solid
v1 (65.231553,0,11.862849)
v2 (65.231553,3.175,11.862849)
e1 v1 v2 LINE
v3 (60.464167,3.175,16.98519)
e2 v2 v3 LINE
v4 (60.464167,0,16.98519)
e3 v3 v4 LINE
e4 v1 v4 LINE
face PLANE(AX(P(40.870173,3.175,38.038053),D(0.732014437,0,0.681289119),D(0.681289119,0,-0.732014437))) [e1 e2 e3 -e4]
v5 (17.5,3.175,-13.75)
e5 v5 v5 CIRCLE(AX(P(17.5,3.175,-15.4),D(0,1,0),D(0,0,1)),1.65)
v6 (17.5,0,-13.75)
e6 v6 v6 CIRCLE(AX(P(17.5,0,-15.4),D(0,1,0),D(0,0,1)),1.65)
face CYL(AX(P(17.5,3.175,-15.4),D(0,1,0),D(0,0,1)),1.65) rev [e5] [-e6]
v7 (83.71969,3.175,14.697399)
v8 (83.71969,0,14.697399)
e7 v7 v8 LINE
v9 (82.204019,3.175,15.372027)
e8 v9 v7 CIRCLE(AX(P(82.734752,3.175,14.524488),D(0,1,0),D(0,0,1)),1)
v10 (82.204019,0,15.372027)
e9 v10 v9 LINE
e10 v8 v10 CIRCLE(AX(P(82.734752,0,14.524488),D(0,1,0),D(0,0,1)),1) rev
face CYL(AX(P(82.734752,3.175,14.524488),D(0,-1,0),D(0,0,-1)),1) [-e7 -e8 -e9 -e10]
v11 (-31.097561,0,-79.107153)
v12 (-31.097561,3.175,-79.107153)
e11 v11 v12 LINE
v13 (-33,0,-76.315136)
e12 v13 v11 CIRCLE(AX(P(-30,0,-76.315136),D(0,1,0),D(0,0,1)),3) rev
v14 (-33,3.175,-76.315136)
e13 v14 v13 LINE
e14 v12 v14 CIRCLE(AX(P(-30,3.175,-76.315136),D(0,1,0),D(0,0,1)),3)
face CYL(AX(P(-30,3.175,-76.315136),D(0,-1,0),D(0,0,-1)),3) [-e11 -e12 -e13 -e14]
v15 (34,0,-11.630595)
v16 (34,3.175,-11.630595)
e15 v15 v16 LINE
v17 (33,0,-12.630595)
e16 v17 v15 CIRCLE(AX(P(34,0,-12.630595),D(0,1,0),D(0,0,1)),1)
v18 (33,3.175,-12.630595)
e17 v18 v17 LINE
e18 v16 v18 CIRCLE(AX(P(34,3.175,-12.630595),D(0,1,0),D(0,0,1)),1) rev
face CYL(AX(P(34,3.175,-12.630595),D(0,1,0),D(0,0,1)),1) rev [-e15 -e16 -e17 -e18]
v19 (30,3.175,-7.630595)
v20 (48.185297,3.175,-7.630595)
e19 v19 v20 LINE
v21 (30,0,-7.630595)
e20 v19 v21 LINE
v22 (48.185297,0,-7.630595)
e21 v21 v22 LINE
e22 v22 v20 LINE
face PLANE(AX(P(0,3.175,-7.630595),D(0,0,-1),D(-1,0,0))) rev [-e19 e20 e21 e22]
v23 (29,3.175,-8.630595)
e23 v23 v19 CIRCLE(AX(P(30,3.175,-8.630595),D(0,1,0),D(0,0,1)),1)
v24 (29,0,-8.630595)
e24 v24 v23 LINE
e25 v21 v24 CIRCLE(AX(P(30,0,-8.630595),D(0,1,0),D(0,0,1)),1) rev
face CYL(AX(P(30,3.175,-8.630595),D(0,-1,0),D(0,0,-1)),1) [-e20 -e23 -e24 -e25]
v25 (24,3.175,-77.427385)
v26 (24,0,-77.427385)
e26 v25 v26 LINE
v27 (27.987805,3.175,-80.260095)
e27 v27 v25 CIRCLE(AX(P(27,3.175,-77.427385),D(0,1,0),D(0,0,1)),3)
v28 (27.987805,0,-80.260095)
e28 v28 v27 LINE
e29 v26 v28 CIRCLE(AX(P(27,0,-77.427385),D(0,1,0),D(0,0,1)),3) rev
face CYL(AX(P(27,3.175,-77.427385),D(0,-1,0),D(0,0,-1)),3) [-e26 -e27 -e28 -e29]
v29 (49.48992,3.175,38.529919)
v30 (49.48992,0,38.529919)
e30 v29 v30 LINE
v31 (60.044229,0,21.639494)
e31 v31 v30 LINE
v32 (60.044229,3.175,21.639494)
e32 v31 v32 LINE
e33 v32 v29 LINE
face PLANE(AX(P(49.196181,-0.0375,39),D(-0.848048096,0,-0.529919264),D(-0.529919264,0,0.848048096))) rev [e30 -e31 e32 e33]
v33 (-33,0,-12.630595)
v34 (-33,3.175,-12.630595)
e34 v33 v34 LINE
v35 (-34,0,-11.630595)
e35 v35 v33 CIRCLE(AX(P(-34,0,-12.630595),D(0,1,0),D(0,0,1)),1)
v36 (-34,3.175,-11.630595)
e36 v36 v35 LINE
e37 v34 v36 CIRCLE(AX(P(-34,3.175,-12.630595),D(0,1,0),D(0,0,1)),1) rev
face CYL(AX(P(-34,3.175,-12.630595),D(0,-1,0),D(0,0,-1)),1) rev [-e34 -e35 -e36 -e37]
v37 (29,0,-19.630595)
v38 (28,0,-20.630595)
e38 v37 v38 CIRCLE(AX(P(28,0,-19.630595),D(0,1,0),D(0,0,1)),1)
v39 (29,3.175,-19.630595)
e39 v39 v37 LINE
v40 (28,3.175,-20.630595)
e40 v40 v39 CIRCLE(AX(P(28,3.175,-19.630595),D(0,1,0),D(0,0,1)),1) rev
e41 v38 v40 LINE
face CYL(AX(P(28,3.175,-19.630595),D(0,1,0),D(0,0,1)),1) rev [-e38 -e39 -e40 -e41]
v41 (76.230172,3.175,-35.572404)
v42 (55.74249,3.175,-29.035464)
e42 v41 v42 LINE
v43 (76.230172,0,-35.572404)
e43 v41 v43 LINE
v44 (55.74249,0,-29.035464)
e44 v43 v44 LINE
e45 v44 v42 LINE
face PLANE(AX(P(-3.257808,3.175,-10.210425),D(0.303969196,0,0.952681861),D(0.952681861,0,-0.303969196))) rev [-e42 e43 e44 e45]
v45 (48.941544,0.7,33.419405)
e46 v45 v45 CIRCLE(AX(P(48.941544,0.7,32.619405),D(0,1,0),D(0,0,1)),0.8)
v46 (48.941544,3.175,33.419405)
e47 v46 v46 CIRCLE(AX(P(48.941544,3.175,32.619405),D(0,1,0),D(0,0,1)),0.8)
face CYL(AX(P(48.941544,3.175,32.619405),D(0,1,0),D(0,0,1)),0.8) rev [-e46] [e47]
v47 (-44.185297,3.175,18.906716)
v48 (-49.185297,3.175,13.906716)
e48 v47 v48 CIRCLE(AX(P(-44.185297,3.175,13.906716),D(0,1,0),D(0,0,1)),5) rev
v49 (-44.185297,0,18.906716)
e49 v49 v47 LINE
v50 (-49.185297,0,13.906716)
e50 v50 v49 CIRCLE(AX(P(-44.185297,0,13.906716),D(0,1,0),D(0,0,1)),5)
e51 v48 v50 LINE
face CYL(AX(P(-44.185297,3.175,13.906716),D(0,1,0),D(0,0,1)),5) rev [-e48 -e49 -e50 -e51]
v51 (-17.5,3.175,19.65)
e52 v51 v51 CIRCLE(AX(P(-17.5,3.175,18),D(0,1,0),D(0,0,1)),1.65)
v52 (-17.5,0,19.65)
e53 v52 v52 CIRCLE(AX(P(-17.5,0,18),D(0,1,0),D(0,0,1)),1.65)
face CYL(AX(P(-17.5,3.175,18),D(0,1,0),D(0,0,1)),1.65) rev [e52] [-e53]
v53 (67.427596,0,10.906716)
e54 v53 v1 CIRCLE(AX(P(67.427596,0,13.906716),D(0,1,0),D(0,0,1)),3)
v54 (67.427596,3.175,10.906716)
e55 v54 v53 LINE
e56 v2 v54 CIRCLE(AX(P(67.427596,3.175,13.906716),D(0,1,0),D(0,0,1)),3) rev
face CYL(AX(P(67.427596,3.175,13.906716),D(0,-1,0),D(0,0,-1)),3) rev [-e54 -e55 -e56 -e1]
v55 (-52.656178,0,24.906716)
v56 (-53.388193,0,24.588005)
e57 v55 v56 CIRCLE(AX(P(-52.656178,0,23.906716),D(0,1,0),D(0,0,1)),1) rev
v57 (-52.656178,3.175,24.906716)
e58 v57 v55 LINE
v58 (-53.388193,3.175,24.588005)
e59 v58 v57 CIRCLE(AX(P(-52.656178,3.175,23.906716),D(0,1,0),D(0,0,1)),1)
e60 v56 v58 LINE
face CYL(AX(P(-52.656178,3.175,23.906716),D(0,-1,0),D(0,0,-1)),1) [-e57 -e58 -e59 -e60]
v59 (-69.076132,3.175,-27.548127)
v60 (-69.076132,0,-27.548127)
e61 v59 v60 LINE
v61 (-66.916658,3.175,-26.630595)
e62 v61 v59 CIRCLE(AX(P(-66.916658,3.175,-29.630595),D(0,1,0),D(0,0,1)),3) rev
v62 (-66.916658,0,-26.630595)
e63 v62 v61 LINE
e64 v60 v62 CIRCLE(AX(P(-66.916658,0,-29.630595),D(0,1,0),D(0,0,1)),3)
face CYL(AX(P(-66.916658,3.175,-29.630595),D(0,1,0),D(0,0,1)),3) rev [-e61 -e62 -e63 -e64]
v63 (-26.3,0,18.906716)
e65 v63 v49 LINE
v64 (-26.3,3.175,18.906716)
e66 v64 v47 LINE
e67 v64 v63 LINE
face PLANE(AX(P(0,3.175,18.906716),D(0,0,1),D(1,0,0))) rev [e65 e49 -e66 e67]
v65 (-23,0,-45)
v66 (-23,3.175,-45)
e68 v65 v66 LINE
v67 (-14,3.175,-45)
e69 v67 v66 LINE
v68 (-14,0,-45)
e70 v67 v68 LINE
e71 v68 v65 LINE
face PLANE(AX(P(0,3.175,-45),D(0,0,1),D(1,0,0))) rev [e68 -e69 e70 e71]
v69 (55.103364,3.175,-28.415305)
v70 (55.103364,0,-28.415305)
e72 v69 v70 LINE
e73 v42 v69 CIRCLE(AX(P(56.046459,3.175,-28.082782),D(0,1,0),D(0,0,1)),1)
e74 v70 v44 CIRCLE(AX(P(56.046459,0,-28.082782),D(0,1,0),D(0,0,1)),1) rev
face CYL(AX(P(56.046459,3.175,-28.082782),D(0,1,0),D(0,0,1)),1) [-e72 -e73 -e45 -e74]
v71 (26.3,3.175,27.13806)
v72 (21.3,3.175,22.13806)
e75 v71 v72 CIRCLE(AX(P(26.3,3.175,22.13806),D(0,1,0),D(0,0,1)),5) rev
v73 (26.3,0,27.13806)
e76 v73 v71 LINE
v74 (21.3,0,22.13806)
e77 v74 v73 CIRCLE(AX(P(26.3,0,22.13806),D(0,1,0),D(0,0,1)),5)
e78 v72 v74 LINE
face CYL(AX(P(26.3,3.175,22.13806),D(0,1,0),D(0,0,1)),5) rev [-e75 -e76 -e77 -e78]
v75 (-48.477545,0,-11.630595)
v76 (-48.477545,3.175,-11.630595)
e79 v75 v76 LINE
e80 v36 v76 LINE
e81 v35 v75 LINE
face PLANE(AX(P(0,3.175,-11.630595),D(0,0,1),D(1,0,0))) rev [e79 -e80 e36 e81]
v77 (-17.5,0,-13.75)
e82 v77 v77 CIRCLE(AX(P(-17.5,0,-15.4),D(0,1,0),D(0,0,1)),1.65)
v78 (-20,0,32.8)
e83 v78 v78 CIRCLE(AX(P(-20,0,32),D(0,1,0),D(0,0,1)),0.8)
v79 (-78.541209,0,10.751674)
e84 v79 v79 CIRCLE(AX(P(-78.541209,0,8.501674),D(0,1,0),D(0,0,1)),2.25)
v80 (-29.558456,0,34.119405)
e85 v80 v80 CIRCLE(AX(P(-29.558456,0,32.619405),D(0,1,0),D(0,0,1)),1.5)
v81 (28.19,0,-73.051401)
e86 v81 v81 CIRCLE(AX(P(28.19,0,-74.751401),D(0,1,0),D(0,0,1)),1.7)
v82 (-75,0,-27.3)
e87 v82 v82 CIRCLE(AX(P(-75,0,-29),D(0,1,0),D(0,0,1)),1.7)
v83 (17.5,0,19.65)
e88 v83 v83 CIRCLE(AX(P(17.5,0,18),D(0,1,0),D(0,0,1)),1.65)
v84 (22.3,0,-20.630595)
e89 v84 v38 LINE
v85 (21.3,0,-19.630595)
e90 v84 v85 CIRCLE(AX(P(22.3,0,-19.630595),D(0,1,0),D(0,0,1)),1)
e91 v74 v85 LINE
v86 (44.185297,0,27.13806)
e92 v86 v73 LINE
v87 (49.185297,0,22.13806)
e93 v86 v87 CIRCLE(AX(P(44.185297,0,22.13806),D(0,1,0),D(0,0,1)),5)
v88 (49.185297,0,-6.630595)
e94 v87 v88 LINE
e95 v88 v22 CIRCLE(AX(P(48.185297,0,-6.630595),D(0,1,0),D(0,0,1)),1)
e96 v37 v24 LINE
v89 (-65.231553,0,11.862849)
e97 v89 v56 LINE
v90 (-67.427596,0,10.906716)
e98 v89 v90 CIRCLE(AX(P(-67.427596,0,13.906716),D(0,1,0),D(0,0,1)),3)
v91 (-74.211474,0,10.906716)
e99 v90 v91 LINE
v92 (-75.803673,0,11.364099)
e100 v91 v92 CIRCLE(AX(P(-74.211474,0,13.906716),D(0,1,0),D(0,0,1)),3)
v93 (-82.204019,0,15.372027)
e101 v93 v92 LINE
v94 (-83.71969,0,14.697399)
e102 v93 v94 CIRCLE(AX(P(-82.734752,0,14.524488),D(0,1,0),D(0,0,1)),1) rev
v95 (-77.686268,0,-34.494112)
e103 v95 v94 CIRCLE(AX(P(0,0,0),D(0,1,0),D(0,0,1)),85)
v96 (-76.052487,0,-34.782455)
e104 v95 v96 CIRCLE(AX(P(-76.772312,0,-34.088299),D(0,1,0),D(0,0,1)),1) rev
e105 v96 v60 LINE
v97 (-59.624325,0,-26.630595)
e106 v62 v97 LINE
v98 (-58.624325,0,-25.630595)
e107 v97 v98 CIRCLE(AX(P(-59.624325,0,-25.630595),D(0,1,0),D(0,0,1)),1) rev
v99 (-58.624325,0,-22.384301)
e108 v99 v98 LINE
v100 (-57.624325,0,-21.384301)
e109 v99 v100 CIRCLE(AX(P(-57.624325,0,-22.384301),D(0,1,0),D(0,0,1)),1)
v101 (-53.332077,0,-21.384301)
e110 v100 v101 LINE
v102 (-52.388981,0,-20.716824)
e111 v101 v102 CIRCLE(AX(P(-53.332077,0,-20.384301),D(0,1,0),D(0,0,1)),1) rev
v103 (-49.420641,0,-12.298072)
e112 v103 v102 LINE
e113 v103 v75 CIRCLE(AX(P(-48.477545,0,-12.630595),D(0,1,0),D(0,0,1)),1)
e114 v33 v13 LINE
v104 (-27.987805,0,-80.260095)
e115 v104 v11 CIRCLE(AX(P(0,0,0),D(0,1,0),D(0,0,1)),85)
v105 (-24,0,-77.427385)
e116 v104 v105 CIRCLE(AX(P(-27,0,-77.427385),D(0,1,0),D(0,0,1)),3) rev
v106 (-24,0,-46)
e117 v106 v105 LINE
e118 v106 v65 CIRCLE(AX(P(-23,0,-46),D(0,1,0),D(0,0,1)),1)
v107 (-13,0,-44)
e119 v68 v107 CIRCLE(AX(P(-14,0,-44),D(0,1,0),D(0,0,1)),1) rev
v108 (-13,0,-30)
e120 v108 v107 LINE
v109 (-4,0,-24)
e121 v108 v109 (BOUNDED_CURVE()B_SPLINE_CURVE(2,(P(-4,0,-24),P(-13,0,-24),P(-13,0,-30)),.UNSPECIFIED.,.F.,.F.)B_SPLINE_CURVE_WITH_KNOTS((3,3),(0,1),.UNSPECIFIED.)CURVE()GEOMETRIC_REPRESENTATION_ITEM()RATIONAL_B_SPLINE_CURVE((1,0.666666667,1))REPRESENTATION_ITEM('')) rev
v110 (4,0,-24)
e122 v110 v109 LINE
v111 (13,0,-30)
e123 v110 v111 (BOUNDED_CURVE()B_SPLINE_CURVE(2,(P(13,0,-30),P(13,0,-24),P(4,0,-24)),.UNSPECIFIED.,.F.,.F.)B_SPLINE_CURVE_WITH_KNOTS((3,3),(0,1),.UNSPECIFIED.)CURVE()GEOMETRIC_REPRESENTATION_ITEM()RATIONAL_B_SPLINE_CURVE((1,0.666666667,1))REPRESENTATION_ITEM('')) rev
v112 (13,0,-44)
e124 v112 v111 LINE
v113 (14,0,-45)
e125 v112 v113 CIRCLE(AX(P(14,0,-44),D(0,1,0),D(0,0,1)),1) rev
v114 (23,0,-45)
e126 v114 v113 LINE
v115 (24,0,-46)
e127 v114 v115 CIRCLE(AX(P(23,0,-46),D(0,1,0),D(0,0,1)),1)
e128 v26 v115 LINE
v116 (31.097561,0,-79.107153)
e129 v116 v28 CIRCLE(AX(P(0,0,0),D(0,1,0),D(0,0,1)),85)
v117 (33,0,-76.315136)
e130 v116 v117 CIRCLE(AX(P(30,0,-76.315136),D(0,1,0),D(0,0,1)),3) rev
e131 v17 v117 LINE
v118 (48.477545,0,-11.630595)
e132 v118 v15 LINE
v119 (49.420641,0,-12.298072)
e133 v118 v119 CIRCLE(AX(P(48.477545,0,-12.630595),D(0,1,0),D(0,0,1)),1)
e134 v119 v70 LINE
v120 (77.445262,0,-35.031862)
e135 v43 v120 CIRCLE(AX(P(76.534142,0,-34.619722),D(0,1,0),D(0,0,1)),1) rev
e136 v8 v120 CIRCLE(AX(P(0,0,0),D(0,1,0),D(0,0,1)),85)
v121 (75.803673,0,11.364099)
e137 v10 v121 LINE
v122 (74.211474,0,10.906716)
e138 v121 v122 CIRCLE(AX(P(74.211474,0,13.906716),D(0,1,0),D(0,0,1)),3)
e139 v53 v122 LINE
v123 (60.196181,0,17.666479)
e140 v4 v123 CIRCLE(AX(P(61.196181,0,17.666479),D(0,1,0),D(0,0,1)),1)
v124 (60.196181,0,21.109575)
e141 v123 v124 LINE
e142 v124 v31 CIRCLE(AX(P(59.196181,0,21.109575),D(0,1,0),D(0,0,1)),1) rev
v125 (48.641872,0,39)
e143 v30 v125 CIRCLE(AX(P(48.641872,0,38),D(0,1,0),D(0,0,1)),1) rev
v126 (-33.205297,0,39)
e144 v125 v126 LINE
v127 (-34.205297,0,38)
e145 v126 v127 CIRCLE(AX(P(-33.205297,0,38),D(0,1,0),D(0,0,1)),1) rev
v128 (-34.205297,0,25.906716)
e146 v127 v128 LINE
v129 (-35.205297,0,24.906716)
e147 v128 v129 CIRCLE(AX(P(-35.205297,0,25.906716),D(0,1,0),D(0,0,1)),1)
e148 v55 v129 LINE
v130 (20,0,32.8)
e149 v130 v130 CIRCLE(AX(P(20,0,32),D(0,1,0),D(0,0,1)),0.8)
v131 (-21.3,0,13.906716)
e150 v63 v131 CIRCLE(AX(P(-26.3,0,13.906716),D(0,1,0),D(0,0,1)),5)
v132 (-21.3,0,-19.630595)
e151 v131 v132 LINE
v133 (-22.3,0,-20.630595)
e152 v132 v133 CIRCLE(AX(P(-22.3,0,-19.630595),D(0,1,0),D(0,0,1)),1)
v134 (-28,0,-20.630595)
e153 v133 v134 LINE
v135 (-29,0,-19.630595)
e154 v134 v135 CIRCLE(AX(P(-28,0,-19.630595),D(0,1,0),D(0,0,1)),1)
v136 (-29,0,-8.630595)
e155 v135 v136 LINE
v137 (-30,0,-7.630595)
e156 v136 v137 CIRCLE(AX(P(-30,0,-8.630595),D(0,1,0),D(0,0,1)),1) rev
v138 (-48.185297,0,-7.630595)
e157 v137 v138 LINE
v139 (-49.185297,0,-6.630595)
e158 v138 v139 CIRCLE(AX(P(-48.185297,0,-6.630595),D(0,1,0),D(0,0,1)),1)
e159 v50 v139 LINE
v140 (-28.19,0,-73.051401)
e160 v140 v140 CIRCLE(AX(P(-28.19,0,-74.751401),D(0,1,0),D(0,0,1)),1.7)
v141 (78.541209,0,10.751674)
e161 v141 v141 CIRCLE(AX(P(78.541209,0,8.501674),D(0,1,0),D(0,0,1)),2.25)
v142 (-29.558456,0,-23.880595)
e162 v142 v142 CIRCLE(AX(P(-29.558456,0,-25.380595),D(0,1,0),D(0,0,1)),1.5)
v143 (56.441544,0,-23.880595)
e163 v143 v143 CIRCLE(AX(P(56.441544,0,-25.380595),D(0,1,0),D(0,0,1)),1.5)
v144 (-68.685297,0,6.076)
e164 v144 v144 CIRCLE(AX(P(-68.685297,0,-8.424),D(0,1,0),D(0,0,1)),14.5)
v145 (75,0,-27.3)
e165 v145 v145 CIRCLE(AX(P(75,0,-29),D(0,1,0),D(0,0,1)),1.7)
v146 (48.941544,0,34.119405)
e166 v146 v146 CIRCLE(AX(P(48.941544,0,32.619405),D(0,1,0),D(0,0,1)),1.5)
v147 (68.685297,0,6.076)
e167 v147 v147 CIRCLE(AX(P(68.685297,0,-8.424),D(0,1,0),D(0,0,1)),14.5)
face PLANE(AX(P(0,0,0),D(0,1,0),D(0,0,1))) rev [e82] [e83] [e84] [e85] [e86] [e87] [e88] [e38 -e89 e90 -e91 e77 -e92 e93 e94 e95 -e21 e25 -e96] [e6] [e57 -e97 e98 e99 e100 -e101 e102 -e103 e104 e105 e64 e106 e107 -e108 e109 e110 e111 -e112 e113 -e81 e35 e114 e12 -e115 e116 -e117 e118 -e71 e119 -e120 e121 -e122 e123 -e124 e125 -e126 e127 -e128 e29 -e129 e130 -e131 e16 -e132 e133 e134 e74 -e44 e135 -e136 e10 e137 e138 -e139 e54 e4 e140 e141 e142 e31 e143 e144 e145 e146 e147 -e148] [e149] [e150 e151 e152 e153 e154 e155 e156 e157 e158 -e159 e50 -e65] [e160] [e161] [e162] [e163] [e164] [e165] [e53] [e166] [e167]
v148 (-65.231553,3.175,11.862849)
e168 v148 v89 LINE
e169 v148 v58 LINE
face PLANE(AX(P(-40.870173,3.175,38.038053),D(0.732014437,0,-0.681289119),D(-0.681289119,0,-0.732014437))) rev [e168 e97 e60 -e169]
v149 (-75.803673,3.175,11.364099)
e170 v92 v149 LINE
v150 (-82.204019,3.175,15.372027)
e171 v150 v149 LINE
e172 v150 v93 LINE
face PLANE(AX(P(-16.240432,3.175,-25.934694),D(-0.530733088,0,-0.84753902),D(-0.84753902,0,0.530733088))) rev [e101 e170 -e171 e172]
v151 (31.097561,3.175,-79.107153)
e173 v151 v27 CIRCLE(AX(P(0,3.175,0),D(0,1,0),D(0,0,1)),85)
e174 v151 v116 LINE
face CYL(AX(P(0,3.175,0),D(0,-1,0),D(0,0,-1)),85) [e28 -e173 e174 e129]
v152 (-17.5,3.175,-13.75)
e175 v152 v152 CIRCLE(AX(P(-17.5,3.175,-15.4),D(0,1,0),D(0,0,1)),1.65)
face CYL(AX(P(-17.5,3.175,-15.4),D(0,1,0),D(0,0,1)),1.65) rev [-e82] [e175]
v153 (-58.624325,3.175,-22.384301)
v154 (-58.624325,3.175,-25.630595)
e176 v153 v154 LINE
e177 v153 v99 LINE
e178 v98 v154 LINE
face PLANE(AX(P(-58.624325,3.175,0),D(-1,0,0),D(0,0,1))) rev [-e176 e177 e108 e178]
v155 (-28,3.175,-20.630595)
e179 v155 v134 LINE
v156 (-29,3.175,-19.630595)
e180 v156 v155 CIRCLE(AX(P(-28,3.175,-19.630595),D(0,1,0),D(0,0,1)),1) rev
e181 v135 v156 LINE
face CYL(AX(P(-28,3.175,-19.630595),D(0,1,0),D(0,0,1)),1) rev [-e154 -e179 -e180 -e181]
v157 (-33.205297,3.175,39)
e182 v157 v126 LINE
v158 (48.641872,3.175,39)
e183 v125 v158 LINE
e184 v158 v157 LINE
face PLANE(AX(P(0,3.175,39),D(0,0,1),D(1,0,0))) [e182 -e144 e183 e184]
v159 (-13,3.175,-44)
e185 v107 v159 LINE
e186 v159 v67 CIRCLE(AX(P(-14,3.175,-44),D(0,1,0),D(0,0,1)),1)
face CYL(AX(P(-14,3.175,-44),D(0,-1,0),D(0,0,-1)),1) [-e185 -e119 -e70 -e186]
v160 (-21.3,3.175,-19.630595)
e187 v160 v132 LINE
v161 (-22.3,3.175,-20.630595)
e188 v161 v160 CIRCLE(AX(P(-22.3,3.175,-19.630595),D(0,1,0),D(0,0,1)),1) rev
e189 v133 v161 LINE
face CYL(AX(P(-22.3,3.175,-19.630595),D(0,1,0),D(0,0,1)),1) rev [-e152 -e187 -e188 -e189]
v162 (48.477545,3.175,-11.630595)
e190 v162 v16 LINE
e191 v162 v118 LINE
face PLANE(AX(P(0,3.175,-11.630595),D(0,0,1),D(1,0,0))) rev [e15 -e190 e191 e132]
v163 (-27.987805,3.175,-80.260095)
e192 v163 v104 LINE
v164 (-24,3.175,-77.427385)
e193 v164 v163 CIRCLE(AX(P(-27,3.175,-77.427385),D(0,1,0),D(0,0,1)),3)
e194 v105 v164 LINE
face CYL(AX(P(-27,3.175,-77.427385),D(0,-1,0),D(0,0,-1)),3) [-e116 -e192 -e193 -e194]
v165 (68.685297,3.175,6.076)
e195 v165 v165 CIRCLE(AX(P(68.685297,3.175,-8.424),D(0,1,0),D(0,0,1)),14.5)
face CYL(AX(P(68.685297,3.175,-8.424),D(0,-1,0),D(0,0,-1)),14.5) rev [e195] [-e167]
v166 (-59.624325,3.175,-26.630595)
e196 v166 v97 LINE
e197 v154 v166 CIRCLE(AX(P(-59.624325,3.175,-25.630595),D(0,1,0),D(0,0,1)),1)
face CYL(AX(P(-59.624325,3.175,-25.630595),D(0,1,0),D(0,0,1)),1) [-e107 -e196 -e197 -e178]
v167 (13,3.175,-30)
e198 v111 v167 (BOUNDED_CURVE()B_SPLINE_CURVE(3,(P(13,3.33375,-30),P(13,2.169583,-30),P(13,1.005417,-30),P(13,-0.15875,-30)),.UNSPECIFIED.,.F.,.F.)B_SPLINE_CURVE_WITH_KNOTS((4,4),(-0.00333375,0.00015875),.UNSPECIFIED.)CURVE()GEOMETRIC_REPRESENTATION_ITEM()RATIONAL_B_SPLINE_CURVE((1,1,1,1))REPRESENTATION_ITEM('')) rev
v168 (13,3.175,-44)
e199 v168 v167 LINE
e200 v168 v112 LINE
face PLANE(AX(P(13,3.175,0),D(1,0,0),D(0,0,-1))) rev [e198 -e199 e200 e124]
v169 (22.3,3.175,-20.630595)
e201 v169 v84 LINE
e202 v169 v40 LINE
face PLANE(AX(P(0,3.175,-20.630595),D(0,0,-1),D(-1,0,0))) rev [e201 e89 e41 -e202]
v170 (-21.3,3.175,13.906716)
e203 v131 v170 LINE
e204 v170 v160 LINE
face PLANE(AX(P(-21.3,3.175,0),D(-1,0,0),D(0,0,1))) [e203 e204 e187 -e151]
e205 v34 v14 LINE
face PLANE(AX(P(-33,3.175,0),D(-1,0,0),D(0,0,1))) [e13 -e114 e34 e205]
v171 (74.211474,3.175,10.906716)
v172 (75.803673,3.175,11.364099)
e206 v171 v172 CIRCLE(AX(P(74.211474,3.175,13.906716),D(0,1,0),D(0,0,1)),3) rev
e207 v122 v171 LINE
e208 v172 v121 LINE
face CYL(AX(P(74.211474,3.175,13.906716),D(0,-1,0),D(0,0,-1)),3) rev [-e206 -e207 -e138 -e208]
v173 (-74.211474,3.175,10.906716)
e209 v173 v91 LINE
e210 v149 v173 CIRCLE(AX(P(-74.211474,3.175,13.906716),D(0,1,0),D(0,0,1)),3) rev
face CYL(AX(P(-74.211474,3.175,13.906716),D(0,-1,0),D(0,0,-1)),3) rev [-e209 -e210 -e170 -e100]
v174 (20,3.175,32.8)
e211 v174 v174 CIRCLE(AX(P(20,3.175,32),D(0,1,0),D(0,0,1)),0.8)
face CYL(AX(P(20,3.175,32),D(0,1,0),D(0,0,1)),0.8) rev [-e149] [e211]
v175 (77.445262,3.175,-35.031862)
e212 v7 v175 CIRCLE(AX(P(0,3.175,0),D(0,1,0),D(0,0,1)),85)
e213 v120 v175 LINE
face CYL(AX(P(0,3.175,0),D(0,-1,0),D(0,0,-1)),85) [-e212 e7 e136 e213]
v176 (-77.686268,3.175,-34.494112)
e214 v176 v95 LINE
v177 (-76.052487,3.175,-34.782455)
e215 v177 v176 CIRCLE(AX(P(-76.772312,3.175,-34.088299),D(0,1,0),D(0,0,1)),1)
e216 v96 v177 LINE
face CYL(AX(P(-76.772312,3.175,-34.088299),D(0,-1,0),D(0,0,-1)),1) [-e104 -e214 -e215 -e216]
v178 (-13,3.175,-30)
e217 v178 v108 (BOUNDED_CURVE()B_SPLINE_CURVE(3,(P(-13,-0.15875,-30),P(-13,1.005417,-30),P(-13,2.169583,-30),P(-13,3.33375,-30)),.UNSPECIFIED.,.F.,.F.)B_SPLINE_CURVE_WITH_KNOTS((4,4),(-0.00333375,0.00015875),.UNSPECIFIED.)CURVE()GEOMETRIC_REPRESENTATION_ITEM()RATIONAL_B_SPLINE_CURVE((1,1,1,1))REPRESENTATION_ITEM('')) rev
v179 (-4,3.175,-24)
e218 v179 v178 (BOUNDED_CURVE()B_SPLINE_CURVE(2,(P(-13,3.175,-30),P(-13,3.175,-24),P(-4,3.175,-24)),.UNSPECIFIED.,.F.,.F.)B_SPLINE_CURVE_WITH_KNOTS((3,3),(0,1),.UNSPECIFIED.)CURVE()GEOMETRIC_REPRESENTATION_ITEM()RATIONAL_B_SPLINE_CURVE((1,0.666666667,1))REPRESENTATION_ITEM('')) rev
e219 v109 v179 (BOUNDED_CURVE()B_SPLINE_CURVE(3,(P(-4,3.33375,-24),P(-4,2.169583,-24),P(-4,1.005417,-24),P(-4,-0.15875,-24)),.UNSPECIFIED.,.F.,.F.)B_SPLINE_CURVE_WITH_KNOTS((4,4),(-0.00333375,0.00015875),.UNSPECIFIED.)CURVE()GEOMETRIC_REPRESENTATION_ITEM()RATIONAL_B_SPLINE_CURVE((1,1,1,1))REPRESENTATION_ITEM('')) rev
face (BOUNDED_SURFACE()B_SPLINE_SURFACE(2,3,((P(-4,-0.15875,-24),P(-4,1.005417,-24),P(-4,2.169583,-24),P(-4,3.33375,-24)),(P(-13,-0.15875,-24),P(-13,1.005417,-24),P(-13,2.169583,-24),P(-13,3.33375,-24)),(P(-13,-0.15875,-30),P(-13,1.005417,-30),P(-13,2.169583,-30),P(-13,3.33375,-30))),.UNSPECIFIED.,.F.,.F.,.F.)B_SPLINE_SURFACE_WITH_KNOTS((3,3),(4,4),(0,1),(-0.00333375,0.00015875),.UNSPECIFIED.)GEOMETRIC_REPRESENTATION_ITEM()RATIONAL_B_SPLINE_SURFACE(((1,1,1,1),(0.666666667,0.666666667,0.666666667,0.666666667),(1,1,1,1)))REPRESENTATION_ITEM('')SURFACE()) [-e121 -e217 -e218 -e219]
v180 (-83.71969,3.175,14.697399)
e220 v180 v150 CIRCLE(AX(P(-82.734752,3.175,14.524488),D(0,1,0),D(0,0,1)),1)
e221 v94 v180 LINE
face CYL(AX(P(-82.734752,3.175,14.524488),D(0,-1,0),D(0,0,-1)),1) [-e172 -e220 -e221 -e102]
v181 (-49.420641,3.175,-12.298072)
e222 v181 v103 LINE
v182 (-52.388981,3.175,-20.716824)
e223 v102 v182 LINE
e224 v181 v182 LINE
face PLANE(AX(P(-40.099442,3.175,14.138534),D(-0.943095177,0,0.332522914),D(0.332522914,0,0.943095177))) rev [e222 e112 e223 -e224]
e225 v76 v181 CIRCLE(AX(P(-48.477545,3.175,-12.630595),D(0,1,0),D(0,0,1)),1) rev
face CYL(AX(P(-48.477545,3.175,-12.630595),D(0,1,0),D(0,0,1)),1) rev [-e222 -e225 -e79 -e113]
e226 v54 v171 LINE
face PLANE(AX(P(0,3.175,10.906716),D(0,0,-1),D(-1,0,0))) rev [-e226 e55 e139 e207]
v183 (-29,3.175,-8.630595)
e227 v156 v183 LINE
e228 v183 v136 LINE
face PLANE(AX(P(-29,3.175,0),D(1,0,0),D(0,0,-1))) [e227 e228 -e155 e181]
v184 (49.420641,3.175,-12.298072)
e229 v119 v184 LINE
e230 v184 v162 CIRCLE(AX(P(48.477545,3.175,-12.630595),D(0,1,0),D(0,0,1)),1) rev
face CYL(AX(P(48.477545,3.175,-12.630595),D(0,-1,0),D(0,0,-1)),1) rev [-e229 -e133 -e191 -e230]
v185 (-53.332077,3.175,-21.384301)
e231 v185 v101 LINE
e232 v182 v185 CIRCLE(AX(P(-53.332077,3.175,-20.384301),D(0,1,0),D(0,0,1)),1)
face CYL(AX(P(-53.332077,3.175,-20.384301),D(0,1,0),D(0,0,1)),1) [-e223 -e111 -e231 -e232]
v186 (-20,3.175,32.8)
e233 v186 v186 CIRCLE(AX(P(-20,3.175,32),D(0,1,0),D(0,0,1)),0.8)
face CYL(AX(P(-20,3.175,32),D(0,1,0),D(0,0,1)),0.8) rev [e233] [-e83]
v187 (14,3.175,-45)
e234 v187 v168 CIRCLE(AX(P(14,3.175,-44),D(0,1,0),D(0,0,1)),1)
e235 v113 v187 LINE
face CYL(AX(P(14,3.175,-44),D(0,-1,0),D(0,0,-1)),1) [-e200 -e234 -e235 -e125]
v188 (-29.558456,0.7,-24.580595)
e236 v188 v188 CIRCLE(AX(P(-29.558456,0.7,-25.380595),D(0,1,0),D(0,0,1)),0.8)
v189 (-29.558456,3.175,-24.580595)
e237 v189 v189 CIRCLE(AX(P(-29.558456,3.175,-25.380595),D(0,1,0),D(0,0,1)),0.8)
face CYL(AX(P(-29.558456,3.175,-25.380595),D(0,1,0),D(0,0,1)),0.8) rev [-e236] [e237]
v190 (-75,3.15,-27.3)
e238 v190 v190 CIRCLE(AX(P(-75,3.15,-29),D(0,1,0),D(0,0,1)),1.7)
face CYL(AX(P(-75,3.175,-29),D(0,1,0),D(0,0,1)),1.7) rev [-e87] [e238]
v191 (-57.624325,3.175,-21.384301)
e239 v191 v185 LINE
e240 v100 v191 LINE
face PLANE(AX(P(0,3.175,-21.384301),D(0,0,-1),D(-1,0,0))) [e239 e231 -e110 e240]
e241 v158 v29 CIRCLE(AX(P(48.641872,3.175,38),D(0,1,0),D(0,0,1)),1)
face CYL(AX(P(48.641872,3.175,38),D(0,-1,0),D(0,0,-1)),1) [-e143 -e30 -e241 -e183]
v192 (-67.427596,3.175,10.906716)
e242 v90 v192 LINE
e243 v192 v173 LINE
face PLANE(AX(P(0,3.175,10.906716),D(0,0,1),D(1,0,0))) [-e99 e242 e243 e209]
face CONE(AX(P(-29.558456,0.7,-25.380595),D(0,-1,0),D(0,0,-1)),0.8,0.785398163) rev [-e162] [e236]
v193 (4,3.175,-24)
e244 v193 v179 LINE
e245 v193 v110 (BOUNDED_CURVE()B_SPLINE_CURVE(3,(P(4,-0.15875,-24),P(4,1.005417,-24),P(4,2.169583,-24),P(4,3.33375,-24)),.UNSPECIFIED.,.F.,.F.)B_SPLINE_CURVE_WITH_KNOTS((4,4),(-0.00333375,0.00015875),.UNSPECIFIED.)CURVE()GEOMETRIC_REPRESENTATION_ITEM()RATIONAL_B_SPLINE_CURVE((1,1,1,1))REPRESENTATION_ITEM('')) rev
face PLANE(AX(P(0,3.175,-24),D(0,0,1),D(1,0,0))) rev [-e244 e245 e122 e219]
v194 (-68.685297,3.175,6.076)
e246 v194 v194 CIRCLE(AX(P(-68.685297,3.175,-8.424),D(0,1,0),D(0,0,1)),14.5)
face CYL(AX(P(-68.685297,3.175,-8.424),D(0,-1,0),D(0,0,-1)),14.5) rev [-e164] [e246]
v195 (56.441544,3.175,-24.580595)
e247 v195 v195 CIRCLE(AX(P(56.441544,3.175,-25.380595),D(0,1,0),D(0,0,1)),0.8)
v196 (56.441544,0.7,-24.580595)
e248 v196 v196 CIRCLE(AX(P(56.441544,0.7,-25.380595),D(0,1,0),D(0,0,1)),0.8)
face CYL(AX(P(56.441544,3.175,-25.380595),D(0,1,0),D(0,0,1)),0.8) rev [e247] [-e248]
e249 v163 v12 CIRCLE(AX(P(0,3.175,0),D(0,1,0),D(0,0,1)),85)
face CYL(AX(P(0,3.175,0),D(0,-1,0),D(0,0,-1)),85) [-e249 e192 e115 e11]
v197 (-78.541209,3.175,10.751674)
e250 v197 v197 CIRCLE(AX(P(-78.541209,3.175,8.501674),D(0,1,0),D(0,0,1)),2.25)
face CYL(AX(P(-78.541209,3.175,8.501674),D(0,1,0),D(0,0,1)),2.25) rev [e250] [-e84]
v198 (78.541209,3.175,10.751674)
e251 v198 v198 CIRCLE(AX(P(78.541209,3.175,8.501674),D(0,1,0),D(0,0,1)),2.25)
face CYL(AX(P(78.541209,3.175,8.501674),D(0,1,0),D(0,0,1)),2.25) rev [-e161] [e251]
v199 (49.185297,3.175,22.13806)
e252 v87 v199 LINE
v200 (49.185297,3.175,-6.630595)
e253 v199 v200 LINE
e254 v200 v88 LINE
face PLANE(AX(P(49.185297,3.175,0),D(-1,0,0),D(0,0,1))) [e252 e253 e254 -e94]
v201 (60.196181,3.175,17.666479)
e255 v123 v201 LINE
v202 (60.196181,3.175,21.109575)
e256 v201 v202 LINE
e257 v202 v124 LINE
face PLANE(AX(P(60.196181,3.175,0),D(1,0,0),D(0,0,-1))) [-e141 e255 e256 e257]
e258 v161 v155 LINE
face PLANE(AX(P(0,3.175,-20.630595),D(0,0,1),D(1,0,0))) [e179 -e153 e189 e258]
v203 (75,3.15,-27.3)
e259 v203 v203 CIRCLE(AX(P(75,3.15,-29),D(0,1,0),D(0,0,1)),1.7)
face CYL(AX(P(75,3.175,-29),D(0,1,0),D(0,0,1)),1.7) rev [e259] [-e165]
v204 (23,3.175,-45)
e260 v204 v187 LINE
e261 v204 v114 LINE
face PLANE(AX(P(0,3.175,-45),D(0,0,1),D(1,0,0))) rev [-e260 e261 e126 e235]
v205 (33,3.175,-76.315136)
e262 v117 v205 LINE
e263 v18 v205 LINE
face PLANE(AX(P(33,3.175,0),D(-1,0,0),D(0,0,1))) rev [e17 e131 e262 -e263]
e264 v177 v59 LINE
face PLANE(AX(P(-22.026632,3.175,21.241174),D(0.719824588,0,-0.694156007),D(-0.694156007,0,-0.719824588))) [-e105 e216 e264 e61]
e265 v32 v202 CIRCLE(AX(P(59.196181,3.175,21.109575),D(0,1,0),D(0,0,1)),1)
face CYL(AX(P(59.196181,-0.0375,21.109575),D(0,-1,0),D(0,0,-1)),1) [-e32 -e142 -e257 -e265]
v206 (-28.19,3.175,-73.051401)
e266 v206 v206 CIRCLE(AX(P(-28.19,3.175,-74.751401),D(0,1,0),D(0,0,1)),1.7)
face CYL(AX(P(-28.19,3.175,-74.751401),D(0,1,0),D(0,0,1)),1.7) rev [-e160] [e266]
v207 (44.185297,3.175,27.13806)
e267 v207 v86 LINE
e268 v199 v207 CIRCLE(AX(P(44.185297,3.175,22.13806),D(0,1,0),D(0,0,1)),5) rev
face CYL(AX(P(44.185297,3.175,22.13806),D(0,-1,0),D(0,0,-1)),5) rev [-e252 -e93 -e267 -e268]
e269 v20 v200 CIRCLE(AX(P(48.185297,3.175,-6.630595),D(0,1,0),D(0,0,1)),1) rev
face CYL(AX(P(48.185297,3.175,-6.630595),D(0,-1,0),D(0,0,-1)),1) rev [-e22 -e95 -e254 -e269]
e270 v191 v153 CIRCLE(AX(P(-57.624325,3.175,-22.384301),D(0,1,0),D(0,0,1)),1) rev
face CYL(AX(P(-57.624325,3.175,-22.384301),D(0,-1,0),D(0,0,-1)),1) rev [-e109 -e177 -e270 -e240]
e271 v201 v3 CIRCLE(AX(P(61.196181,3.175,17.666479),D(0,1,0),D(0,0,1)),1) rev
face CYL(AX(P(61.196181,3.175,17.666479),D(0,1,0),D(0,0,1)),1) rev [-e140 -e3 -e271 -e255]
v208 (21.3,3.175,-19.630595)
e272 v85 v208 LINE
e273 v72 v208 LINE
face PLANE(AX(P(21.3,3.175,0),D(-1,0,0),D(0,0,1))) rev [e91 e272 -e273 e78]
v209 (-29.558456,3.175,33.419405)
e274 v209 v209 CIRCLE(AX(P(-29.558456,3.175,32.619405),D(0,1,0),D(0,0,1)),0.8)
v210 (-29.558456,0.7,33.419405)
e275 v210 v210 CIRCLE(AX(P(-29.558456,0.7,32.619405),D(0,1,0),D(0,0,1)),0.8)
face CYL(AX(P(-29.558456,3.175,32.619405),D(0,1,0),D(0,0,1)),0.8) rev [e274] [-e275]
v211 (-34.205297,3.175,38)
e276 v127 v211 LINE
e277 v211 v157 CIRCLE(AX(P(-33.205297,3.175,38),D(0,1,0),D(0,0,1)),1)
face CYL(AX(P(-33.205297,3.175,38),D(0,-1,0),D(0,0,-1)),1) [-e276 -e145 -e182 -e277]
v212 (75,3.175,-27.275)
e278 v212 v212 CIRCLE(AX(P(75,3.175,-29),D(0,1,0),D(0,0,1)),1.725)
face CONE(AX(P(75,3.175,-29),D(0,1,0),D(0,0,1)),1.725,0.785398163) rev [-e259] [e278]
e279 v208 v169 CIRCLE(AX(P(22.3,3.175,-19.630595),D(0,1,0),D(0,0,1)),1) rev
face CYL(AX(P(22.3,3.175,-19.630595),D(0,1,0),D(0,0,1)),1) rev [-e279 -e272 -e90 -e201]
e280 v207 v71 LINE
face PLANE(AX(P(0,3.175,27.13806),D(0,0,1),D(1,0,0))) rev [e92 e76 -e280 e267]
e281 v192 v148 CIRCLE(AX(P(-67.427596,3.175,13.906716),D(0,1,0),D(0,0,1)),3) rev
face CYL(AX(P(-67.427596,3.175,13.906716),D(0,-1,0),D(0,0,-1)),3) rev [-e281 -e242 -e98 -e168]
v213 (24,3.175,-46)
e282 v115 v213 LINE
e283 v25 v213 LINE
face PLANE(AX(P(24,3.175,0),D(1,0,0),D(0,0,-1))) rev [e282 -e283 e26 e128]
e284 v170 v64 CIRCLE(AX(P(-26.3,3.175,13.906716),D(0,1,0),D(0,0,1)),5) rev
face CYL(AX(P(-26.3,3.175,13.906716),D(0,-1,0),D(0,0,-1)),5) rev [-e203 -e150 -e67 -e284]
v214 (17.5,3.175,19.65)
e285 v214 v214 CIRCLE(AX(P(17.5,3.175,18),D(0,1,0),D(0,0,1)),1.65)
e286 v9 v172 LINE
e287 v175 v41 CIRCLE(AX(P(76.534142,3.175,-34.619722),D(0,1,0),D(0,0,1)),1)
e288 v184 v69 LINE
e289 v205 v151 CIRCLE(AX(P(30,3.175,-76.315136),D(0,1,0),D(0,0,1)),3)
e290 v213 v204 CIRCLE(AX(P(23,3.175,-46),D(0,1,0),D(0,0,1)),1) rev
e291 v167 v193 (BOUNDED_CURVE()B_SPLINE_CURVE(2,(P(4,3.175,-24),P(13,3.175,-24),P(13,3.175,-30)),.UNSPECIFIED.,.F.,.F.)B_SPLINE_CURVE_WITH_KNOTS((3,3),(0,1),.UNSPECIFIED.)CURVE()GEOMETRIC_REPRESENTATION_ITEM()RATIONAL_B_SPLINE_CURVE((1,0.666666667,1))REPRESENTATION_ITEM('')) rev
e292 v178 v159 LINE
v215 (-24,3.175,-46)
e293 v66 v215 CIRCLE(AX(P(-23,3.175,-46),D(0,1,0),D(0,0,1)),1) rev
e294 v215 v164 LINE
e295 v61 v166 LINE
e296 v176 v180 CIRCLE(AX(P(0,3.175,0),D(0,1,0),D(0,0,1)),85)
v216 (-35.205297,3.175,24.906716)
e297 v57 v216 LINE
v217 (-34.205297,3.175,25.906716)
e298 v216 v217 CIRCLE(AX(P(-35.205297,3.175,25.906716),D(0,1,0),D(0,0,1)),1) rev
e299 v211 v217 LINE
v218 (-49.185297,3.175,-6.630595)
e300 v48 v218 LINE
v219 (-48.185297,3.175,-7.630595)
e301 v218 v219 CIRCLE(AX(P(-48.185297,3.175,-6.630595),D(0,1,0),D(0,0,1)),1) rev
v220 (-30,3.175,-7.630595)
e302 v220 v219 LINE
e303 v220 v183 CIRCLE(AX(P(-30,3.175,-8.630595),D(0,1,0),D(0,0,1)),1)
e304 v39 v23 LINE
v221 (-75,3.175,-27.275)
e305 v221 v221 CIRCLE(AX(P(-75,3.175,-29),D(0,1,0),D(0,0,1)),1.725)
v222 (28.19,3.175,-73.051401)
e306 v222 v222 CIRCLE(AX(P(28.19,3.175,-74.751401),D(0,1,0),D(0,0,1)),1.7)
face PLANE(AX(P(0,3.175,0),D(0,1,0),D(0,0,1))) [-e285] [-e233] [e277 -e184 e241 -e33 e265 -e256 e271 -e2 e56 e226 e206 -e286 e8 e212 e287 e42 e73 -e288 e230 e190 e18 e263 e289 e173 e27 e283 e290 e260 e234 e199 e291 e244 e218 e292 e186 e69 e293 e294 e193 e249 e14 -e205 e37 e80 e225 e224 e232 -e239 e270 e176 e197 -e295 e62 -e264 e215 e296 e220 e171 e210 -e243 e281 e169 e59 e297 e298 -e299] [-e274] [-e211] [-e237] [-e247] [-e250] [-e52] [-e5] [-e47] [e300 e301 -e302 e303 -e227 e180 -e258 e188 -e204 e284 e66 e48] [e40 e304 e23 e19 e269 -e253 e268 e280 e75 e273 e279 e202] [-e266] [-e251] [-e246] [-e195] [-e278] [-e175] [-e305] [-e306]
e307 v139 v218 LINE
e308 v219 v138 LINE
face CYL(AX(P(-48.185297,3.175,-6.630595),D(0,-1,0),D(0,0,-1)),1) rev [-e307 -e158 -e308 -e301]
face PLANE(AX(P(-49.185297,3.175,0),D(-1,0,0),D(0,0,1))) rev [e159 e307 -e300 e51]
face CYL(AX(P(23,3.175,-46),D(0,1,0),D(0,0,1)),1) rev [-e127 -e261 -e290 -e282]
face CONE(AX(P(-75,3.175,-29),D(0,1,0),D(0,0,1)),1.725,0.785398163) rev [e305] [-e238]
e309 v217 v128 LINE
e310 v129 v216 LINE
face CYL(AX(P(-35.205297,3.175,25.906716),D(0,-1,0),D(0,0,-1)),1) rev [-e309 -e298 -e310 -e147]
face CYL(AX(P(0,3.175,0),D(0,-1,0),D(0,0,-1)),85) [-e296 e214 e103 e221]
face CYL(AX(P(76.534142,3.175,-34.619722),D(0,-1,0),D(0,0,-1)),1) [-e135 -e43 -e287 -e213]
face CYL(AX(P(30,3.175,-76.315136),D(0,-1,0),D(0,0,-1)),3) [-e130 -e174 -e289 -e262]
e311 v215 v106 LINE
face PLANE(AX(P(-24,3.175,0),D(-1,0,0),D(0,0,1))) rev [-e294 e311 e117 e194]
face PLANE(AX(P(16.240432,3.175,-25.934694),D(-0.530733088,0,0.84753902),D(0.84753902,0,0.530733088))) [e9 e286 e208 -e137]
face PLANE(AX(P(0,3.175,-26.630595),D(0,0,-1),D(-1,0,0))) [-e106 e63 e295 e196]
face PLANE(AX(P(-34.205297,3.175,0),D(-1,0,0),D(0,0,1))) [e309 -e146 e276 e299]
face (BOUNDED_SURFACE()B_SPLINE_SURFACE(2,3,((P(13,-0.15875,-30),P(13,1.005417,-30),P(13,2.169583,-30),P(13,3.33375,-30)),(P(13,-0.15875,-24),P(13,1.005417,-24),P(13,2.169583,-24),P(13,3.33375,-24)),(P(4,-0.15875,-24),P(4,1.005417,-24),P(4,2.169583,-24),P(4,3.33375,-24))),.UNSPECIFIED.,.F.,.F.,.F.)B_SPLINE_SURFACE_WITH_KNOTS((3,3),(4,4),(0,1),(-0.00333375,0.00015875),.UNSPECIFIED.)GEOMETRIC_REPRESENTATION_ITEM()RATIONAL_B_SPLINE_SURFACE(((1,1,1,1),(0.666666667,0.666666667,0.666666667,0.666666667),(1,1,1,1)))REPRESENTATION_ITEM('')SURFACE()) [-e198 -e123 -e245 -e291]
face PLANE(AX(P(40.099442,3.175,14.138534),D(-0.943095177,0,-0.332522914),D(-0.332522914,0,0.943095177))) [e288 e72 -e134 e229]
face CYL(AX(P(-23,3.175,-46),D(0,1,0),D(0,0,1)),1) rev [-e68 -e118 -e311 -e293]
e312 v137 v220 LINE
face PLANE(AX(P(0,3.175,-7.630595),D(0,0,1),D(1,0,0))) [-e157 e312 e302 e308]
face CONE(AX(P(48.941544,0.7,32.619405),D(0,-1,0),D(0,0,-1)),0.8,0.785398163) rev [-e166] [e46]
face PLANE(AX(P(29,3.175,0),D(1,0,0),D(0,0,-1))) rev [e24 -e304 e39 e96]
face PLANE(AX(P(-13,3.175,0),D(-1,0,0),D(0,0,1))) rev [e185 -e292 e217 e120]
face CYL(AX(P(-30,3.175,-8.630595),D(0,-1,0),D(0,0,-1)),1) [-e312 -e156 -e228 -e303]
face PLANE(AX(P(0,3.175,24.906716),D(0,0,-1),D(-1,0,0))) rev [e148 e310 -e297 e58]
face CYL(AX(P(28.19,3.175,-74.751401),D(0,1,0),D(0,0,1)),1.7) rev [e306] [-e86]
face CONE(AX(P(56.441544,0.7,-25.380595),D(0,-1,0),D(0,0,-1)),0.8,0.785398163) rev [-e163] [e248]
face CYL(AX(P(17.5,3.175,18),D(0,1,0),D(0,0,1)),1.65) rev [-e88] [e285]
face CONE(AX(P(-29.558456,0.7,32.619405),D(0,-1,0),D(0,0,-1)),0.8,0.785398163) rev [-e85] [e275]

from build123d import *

# Parameters (mm, degrees)
BOSS_EXTRUDE1_OUTLINE_R        = 14.5
BOSS_EXTRUDE1_DEPTH            = 3.175
M4_CLEARANCE_HOLE1_D           = 4.5
F_3_3_3_3_DIAMETER_HOLE4_D     = 3.3
M3_CLEARANCE_HOLE2_D           = 3.4
M2X0_4_TAPPED_HOLE2_AT_2_COUNT = 2
M2X0_4_TAPPED_HOLE2_AT_2_PITCH = 86
M2X0_4_TAPPED_HOLE2_AT_3_COUNT = 2
M2X0_4_TAPPED_HOLE2_AT_3_PITCH = 103.730419839
M2X0_4_TAPPED_HOLE2_AT_4_COUNT = 2
M2X0_4_TAPPED_HOLE2_AT_4_PITCH = 58
M2X0_4_TAPPED_HOLE2_AT_5_COUNT = 2
M2X0_4_TAPPED_HOLE2_AT_5_PITCH = 97.602510214
FILLET1_R                      = 3
FILLET2_R                      = 1
FILLET3_SIZE                   = 6
FILLET3_SIZE_2                 = 9
FILLET4_R                      = 5
M3_CLEARANCE_HOLE1_D           = 3.4
M3_CLEARANCE_HOLE1_CSINK_D     = 3.45
M3_CLEARANCE_HOLE1_CSINK_ANGLE = 90
M2X0_4_TAPPED_HOLE1_D          = 1.6
CUT_EXTRUDE1_DEPTH             = 118.062568615
FILLET5_R                      = 1


with BuildPart() as part:
    # Boss-Extrude1: read off the stored shape, not the designer's step
    # Boss-Extrude1 outline → Boss-Extrude1 (new body)
    with BuildSketch(Plane(origin=(0, 0, 0), x_dir=(1, 0, 0), z_dir=(0, 1, 0))):
        with BuildLine():
            Line((33, 11.630595388), (33, 78.33262411))
            ThreePointArc((33, 78.33262411), (28.545123253, 80.063574355), (24, 81.541400528))
            Line((24, 81.541400528), (24, 45))
            Line((24, 45), (13, 45))
            Line((13, 45), (13, 24))
            Line((13, 24), (-13, 24))
            Line((-13, 24), (-13, 45))
            Line((-13, 45), (-24, 45))
            Line((-24, 45), (-24, 81.541400528))
            ThreePointArc((-24, 81.541400528), (-28.545123253, 80.063574355), (-33, 78.33262411))
            Line((-33, 78.33262411), (-33, 11.630595388))
            Line((-33, 11.630595388), (-49.185297029, 11.630595388))
            Line((-49.185297029, 11.630595388), (-52.624325057, 21.384301413))
            Line((-52.624325057, 21.384301413), (-58.624325057, 21.384301413))
            Line((-58.624325057, 21.384301413), (-58.624325057, 26.630595388))
            Line((-58.624325057, 26.630595388), (-68.191318528, 26.630595388))
            Line((-68.191318528, 26.630595388), (-77.073860284, 35.841596796))
            ThreePointArc((-77.073860284, 35.841596796), (-84.367778143, 10.347850562), (-83.451078309, -16.152941807))
            Line((-83.451078309, -16.152941807), (-75.073268231, -10.906716078))
            Line((-75.073268231, -10.906716078), (-66.121429656, -10.906716078))
            Line((-66.121429656, -10.906716078), (-53.091566877, -24.906716078))
            Line((-53.091566877, -24.906716078), (-34.205297029, -24.906716078))
            Line((-34.205297029, -24.906716078), (-34.205297029, -39))
            Line((-34.205297029, -39), (60.196181169, -39))
            Line((60.196181169, -39), (60.196181169, -17.27312839))
            Line((60.196181169, -17.27312839), (66.121429656, -10.906716078))
            Line((66.121429656, -10.906716078), (75.073268231, -10.906716078))
            Line((75.073268231, -10.906716078), (83.451078309, -16.152941807))
            ThreePointArc((83.451078309, -16.152941807), (84.367778143, 10.347850562), (77.073860284, 35.841596796))
            Line((77.073860284, 35.841596796), (55.268726082, 28.884301413))
            Line((55.268726082, 28.884301413), (49.185297029, 11.630595388))
            Line((49.185297029, 11.630595388), (33, 11.630595388))
        make_face()
        with Locations((-68.685297029, 8.424)):
            Circle(BOSS_EXTRUDE1_OUTLINE_R, mode=Mode.SUBTRACT)
        Polygon((-49.185297029, -18.906716078), (-49.185297029, 7.630595388), (-29, 7.630595388), (-29, 20.630595388), (-21.3, 20.630595388), (-21.3, -18.906716078), align=None, mode=Mode.SUBTRACT)
        Polygon((29, 20.630595388), (29, 7.630595388), (49.185297029, 7.630595388), (49.185297029, -27.138060345), (21.3, -27.138060345), (21.3, 20.630595388), align=None, mode=Mode.SUBTRACT)
        with Locations((68.685297029, 8.424)):
            Circle(BOSS_EXTRUDE1_OUTLINE_R, mode=Mode.SUBTRACT)
    extrude(amount=BOSS_EXTRUDE1_DEPTH)

    # M4 Clearance Hole1 (through all)
    with Locations(Plane(origin=(0, 3.175, 0), x_dir=(1, 0, 0), z_dir=(0, 1, 0))):
        with Locations((-78.54120923, -8.5016735), (78.54120923, -8.5016735)):
            Hole(M4_CLEARANCE_HOLE1_D / 2)

    # Ø3.3 (3.3) Diameter Hole4 (through all)
    with Locations(Plane(origin=(0, 3.175, 0), x_dir=(1, 0, 0), z_dir=(0, 1, 0))):
        with Locations((17.5, 15.4), (-17.5, -18), (-17.5, 15.4), (17.5, -18)):
            Hole(F_3_3_3_3_DIAMETER_HOLE4_D / 2)

    # M3 Clearance Hole2 (through all)
    with Locations(Plane(origin=(0, 3.175, 0), x_dir=(1, 0, 0), z_dir=(0, 1, 0))):
        with Locations((28.19, 74.751400528), (-28.19, 74.751400528)):
            Hole(M3_CLEARANCE_HOLE2_D / 2)

    # Sketch15 → M2x0.4 Tapped Hole2 (revolve, cut)
    with BuildSketch(Plane(origin=(-29.558455866, 3.175, -25.380595388), x_dir=(0, 0, 1), z_dir=(1, 0, 0))):
        Polygon((0, 0), (0, 3.175), (1.5, 3.175), (0.8, 2.475), (0.8, 0), align=None)
    m2x0_4_tapped_hole2 = revolve(axis=Axis((-29.558455866, 9.525, -25.380595388), (0, -1, 0)), mode=Mode.SUBTRACT)

    # M2x0.4 Tapped Hole2 at 2: M2x0.4 Tapped Hole2 ×2
    with Locations(*[(i * M2X0_4_TAPPED_HOLE2_AT_2_PITCH, 0, 0) for i in range(1, M2X0_4_TAPPED_HOLE2_AT_2_COUNT)]):
        add(m2x0_4_tapped_hole2, mode=Mode.SUBTRACT)

    # M2x0.4 Tapped Hole2 at 3: M2x0.4 Tapped Hole2 ×2
    with Locations(*[Vector(0.8290721288256765, 0, 0.5591416682777818) * (i * M2X0_4_TAPPED_HOLE2_AT_3_PITCH) for i in range(1, M2X0_4_TAPPED_HOLE2_AT_3_COUNT)]):
        add(m2x0_4_tapped_hole2, mode=Mode.SUBTRACT)

    # M2x0.4 Tapped Hole2 at 4: M2x0.4 Tapped Hole2 ×2
    with Locations(*[(0, 0, i * M2X0_4_TAPPED_HOLE2_AT_4_PITCH) for i in range(1, M2X0_4_TAPPED_HOLE2_AT_4_COUNT)]):
        add(m2x0_4_tapped_hole2, mode=Mode.SUBTRACT)

    # M2x0.4 Tapped Hole2 at 5: M2x0.4 Tapped Hole2 ×2
    with Locations(*[Vector(0.8042825930213097, 0, 0.59424701140428) * (i * M2X0_4_TAPPED_HOLE2_AT_5_PITCH) for i in range(1, M2X0_4_TAPPED_HOLE2_AT_5_COUNT)]):
        add(m2x0_4_tapped_hole2, mode=Mode.SUBTRACT)

    # Fillet1
    fillet1_edges = [part.edges().sort_by_distance(p)[0] for p in [
        (75.073268231, 1.5875, 10.906716078),
        (66.121429656, 1.5875, 10.906716078),
        (-66.121429656, 1.5875, 10.906716078),
        (-75.073268231, 1.5875, 10.906716078),
        (-68.191318528, 1.5875, -26.630595388),
        (-33, 1.5875, -78.33262411),
        (-24, 1.5875, -81.541400528),
        (24, 1.5875, -81.541400528),
        (33, 1.5875, -78.33262411),
    ]]
    fillet(fillet1_edges, radius=FILLET1_R)

    # Fillet2
    fillet2_edges = [part.edges().sort_by_distance(p)[0] for p in [
        (33, 1.5875, -11.630595388),
        (49.185297029, 1.5875, -11.630595388),
        (55.268726082, 1.5875, -28.884301413),
        (77.073860284, 1.5875, -35.841596796),
        (83.451078309, 1.5875, 16.152941807),
        (60.196181169, 1.5875, 17.27312839),
        (60.196181169, 1.5875, 39),
        (-34.205297029, 1.5875, 39),
        (-34.205297029, 1.5875, 24.906716078),
        (-53.091566877, 1.5875, 24.906716078),
        (-83.451078309, 1.5875, 16.152941807),
        (-77.073860284, 1.5875, -35.841596796),
        (-58.624325057, 1.5875, -26.630595388),
        (-58.624325057, 1.5875, -21.384301413),
        (-52.624325057, 1.5875, -21.384301413),
        (-49.185297029, 1.5875, -11.630595388),
        (-33, 1.5875, -11.630595388),
        (-24, 1.5875, -45),
        (-13, 1.5875, -45),
        (13, 1.5875, -45),
        (24, 1.5875, -45),
        (-49.185297029, 1.5875, -7.630595388),
        (-21.3, 1.5875, -20.630595388),
        (-29, 1.5875, -20.630595388),
        (-29, 1.5875, -7.630595388),
        (29, 1.5875, -20.630595388),
        (21.3, 1.5875, -20.630595388),
        (49.185297029, 1.5875, -7.630595388),
        (29, 1.5875, -7.630595388),
    ]]
    fillet(fillet2_edges, radius=FILLET2_R)

    # Fillet3
    # a fillet whose section is not a circle: 9, 6 mm, written as the material it adds along each edge
    with BuildSketch(Plane(origin=(13, 0, -24), x_dir=(0, 0, -1), z_dir=(0, 1, 0))) as fillet3_piece_1:
        with BuildLine():
            Bezier((FILLET3_SIZE, 0), (0, 0), (0, FILLET3_SIZE_2), weights=[1, 0.666666667, 1])
            Line((0, FILLET3_SIZE_2), (0, 0))
            Line((0, 0), (FILLET3_SIZE, 0))
        make_face()
    extrude(amount=3.175)
    with BuildSketch(Plane(origin=(-13, 0, -24), x_dir=(1, 0, 0), z_dir=(0, 1, 0))) as fillet3_piece_2:
        with BuildLine():
            Bezier((FILLET3_SIZE_2, 0), (0, 0), (0, FILLET3_SIZE), weights=[1, 0.666666667, 1])
            Line((0, FILLET3_SIZE), (0, 0))
            Line((0, 0), (FILLET3_SIZE_2, 0))
        make_face()
    extrude(amount=3.175)

    # Fillet4
    fillet4_edges = [part.edges().sort_by_distance(p)[0] for p in [
        (-49.185297029, 1.5875, 18.906716078),
        (-21.3, 1.5875, 18.906716078),
        (21.3, 1.5875, 27.138060345),
        (49.185297029, 1.5875, 27.138060345),
    ]]
    fillet(fillet4_edges, radius=FILLET4_R)

    # M3 Clearance Hole1 (through all)
    with Locations(Plane(origin=(0, 3.175, 0), x_dir=(1, 0, 0), z_dir=(0, 1, 0))):
        with Locations((75, 29), (-75, 29)):
            CounterSinkHole(M3_CLEARANCE_HOLE1_D / 2, M3_CLEARANCE_HOLE1_CSINK_D / 2, counter_sink_angle=M3_CLEARANCE_HOLE1_CSINK_ANGLE)

    # M2x0.4 Tapped Hole1 (through all)
    with Locations(Plane(origin=(0, 3.175, 0), x_dir=(1, 0, 0), z_dir=(0, 1, 0))):
        with Locations((-20, -32), (20, -32)):
            Hole(M2X0_4_TAPPED_HOLE1_D / 2)

    # Sketch32 → Cut-Extrude1 (cut, through all)
    with BuildSketch(Plane(origin=(0, 3.175, 0), x_dir=(1, 0, 0), z_dir=(0, 1, 0))):
        with BuildLine():
            Line((49.196181169, -39), (60.196181169, -21.396320181))
            Line((60.196181169, -21.396320181), (60.196181169, -38))
            ThreePointArc((60.196181169, -38), (59.90328795, -38.707106781), (59.196181169, -39))
            Line((59.196181169, -39), (49.196181169, -39))
        make_face()
    extrude(amount=-CUT_EXTRUDE1_DEPTH, mode=Mode.SUBTRACT)

    # Fillet5
    fillet5_edges = [part.edges().sort_by_distance(p)[0] for p in [
        (49.196181169, 1.5875, 39),
        (60.196181169, 1.5875, 21.396320181),
    ]]
    fillet(fillet5_edges, radius=FILLET5_R)


solid = part.part
